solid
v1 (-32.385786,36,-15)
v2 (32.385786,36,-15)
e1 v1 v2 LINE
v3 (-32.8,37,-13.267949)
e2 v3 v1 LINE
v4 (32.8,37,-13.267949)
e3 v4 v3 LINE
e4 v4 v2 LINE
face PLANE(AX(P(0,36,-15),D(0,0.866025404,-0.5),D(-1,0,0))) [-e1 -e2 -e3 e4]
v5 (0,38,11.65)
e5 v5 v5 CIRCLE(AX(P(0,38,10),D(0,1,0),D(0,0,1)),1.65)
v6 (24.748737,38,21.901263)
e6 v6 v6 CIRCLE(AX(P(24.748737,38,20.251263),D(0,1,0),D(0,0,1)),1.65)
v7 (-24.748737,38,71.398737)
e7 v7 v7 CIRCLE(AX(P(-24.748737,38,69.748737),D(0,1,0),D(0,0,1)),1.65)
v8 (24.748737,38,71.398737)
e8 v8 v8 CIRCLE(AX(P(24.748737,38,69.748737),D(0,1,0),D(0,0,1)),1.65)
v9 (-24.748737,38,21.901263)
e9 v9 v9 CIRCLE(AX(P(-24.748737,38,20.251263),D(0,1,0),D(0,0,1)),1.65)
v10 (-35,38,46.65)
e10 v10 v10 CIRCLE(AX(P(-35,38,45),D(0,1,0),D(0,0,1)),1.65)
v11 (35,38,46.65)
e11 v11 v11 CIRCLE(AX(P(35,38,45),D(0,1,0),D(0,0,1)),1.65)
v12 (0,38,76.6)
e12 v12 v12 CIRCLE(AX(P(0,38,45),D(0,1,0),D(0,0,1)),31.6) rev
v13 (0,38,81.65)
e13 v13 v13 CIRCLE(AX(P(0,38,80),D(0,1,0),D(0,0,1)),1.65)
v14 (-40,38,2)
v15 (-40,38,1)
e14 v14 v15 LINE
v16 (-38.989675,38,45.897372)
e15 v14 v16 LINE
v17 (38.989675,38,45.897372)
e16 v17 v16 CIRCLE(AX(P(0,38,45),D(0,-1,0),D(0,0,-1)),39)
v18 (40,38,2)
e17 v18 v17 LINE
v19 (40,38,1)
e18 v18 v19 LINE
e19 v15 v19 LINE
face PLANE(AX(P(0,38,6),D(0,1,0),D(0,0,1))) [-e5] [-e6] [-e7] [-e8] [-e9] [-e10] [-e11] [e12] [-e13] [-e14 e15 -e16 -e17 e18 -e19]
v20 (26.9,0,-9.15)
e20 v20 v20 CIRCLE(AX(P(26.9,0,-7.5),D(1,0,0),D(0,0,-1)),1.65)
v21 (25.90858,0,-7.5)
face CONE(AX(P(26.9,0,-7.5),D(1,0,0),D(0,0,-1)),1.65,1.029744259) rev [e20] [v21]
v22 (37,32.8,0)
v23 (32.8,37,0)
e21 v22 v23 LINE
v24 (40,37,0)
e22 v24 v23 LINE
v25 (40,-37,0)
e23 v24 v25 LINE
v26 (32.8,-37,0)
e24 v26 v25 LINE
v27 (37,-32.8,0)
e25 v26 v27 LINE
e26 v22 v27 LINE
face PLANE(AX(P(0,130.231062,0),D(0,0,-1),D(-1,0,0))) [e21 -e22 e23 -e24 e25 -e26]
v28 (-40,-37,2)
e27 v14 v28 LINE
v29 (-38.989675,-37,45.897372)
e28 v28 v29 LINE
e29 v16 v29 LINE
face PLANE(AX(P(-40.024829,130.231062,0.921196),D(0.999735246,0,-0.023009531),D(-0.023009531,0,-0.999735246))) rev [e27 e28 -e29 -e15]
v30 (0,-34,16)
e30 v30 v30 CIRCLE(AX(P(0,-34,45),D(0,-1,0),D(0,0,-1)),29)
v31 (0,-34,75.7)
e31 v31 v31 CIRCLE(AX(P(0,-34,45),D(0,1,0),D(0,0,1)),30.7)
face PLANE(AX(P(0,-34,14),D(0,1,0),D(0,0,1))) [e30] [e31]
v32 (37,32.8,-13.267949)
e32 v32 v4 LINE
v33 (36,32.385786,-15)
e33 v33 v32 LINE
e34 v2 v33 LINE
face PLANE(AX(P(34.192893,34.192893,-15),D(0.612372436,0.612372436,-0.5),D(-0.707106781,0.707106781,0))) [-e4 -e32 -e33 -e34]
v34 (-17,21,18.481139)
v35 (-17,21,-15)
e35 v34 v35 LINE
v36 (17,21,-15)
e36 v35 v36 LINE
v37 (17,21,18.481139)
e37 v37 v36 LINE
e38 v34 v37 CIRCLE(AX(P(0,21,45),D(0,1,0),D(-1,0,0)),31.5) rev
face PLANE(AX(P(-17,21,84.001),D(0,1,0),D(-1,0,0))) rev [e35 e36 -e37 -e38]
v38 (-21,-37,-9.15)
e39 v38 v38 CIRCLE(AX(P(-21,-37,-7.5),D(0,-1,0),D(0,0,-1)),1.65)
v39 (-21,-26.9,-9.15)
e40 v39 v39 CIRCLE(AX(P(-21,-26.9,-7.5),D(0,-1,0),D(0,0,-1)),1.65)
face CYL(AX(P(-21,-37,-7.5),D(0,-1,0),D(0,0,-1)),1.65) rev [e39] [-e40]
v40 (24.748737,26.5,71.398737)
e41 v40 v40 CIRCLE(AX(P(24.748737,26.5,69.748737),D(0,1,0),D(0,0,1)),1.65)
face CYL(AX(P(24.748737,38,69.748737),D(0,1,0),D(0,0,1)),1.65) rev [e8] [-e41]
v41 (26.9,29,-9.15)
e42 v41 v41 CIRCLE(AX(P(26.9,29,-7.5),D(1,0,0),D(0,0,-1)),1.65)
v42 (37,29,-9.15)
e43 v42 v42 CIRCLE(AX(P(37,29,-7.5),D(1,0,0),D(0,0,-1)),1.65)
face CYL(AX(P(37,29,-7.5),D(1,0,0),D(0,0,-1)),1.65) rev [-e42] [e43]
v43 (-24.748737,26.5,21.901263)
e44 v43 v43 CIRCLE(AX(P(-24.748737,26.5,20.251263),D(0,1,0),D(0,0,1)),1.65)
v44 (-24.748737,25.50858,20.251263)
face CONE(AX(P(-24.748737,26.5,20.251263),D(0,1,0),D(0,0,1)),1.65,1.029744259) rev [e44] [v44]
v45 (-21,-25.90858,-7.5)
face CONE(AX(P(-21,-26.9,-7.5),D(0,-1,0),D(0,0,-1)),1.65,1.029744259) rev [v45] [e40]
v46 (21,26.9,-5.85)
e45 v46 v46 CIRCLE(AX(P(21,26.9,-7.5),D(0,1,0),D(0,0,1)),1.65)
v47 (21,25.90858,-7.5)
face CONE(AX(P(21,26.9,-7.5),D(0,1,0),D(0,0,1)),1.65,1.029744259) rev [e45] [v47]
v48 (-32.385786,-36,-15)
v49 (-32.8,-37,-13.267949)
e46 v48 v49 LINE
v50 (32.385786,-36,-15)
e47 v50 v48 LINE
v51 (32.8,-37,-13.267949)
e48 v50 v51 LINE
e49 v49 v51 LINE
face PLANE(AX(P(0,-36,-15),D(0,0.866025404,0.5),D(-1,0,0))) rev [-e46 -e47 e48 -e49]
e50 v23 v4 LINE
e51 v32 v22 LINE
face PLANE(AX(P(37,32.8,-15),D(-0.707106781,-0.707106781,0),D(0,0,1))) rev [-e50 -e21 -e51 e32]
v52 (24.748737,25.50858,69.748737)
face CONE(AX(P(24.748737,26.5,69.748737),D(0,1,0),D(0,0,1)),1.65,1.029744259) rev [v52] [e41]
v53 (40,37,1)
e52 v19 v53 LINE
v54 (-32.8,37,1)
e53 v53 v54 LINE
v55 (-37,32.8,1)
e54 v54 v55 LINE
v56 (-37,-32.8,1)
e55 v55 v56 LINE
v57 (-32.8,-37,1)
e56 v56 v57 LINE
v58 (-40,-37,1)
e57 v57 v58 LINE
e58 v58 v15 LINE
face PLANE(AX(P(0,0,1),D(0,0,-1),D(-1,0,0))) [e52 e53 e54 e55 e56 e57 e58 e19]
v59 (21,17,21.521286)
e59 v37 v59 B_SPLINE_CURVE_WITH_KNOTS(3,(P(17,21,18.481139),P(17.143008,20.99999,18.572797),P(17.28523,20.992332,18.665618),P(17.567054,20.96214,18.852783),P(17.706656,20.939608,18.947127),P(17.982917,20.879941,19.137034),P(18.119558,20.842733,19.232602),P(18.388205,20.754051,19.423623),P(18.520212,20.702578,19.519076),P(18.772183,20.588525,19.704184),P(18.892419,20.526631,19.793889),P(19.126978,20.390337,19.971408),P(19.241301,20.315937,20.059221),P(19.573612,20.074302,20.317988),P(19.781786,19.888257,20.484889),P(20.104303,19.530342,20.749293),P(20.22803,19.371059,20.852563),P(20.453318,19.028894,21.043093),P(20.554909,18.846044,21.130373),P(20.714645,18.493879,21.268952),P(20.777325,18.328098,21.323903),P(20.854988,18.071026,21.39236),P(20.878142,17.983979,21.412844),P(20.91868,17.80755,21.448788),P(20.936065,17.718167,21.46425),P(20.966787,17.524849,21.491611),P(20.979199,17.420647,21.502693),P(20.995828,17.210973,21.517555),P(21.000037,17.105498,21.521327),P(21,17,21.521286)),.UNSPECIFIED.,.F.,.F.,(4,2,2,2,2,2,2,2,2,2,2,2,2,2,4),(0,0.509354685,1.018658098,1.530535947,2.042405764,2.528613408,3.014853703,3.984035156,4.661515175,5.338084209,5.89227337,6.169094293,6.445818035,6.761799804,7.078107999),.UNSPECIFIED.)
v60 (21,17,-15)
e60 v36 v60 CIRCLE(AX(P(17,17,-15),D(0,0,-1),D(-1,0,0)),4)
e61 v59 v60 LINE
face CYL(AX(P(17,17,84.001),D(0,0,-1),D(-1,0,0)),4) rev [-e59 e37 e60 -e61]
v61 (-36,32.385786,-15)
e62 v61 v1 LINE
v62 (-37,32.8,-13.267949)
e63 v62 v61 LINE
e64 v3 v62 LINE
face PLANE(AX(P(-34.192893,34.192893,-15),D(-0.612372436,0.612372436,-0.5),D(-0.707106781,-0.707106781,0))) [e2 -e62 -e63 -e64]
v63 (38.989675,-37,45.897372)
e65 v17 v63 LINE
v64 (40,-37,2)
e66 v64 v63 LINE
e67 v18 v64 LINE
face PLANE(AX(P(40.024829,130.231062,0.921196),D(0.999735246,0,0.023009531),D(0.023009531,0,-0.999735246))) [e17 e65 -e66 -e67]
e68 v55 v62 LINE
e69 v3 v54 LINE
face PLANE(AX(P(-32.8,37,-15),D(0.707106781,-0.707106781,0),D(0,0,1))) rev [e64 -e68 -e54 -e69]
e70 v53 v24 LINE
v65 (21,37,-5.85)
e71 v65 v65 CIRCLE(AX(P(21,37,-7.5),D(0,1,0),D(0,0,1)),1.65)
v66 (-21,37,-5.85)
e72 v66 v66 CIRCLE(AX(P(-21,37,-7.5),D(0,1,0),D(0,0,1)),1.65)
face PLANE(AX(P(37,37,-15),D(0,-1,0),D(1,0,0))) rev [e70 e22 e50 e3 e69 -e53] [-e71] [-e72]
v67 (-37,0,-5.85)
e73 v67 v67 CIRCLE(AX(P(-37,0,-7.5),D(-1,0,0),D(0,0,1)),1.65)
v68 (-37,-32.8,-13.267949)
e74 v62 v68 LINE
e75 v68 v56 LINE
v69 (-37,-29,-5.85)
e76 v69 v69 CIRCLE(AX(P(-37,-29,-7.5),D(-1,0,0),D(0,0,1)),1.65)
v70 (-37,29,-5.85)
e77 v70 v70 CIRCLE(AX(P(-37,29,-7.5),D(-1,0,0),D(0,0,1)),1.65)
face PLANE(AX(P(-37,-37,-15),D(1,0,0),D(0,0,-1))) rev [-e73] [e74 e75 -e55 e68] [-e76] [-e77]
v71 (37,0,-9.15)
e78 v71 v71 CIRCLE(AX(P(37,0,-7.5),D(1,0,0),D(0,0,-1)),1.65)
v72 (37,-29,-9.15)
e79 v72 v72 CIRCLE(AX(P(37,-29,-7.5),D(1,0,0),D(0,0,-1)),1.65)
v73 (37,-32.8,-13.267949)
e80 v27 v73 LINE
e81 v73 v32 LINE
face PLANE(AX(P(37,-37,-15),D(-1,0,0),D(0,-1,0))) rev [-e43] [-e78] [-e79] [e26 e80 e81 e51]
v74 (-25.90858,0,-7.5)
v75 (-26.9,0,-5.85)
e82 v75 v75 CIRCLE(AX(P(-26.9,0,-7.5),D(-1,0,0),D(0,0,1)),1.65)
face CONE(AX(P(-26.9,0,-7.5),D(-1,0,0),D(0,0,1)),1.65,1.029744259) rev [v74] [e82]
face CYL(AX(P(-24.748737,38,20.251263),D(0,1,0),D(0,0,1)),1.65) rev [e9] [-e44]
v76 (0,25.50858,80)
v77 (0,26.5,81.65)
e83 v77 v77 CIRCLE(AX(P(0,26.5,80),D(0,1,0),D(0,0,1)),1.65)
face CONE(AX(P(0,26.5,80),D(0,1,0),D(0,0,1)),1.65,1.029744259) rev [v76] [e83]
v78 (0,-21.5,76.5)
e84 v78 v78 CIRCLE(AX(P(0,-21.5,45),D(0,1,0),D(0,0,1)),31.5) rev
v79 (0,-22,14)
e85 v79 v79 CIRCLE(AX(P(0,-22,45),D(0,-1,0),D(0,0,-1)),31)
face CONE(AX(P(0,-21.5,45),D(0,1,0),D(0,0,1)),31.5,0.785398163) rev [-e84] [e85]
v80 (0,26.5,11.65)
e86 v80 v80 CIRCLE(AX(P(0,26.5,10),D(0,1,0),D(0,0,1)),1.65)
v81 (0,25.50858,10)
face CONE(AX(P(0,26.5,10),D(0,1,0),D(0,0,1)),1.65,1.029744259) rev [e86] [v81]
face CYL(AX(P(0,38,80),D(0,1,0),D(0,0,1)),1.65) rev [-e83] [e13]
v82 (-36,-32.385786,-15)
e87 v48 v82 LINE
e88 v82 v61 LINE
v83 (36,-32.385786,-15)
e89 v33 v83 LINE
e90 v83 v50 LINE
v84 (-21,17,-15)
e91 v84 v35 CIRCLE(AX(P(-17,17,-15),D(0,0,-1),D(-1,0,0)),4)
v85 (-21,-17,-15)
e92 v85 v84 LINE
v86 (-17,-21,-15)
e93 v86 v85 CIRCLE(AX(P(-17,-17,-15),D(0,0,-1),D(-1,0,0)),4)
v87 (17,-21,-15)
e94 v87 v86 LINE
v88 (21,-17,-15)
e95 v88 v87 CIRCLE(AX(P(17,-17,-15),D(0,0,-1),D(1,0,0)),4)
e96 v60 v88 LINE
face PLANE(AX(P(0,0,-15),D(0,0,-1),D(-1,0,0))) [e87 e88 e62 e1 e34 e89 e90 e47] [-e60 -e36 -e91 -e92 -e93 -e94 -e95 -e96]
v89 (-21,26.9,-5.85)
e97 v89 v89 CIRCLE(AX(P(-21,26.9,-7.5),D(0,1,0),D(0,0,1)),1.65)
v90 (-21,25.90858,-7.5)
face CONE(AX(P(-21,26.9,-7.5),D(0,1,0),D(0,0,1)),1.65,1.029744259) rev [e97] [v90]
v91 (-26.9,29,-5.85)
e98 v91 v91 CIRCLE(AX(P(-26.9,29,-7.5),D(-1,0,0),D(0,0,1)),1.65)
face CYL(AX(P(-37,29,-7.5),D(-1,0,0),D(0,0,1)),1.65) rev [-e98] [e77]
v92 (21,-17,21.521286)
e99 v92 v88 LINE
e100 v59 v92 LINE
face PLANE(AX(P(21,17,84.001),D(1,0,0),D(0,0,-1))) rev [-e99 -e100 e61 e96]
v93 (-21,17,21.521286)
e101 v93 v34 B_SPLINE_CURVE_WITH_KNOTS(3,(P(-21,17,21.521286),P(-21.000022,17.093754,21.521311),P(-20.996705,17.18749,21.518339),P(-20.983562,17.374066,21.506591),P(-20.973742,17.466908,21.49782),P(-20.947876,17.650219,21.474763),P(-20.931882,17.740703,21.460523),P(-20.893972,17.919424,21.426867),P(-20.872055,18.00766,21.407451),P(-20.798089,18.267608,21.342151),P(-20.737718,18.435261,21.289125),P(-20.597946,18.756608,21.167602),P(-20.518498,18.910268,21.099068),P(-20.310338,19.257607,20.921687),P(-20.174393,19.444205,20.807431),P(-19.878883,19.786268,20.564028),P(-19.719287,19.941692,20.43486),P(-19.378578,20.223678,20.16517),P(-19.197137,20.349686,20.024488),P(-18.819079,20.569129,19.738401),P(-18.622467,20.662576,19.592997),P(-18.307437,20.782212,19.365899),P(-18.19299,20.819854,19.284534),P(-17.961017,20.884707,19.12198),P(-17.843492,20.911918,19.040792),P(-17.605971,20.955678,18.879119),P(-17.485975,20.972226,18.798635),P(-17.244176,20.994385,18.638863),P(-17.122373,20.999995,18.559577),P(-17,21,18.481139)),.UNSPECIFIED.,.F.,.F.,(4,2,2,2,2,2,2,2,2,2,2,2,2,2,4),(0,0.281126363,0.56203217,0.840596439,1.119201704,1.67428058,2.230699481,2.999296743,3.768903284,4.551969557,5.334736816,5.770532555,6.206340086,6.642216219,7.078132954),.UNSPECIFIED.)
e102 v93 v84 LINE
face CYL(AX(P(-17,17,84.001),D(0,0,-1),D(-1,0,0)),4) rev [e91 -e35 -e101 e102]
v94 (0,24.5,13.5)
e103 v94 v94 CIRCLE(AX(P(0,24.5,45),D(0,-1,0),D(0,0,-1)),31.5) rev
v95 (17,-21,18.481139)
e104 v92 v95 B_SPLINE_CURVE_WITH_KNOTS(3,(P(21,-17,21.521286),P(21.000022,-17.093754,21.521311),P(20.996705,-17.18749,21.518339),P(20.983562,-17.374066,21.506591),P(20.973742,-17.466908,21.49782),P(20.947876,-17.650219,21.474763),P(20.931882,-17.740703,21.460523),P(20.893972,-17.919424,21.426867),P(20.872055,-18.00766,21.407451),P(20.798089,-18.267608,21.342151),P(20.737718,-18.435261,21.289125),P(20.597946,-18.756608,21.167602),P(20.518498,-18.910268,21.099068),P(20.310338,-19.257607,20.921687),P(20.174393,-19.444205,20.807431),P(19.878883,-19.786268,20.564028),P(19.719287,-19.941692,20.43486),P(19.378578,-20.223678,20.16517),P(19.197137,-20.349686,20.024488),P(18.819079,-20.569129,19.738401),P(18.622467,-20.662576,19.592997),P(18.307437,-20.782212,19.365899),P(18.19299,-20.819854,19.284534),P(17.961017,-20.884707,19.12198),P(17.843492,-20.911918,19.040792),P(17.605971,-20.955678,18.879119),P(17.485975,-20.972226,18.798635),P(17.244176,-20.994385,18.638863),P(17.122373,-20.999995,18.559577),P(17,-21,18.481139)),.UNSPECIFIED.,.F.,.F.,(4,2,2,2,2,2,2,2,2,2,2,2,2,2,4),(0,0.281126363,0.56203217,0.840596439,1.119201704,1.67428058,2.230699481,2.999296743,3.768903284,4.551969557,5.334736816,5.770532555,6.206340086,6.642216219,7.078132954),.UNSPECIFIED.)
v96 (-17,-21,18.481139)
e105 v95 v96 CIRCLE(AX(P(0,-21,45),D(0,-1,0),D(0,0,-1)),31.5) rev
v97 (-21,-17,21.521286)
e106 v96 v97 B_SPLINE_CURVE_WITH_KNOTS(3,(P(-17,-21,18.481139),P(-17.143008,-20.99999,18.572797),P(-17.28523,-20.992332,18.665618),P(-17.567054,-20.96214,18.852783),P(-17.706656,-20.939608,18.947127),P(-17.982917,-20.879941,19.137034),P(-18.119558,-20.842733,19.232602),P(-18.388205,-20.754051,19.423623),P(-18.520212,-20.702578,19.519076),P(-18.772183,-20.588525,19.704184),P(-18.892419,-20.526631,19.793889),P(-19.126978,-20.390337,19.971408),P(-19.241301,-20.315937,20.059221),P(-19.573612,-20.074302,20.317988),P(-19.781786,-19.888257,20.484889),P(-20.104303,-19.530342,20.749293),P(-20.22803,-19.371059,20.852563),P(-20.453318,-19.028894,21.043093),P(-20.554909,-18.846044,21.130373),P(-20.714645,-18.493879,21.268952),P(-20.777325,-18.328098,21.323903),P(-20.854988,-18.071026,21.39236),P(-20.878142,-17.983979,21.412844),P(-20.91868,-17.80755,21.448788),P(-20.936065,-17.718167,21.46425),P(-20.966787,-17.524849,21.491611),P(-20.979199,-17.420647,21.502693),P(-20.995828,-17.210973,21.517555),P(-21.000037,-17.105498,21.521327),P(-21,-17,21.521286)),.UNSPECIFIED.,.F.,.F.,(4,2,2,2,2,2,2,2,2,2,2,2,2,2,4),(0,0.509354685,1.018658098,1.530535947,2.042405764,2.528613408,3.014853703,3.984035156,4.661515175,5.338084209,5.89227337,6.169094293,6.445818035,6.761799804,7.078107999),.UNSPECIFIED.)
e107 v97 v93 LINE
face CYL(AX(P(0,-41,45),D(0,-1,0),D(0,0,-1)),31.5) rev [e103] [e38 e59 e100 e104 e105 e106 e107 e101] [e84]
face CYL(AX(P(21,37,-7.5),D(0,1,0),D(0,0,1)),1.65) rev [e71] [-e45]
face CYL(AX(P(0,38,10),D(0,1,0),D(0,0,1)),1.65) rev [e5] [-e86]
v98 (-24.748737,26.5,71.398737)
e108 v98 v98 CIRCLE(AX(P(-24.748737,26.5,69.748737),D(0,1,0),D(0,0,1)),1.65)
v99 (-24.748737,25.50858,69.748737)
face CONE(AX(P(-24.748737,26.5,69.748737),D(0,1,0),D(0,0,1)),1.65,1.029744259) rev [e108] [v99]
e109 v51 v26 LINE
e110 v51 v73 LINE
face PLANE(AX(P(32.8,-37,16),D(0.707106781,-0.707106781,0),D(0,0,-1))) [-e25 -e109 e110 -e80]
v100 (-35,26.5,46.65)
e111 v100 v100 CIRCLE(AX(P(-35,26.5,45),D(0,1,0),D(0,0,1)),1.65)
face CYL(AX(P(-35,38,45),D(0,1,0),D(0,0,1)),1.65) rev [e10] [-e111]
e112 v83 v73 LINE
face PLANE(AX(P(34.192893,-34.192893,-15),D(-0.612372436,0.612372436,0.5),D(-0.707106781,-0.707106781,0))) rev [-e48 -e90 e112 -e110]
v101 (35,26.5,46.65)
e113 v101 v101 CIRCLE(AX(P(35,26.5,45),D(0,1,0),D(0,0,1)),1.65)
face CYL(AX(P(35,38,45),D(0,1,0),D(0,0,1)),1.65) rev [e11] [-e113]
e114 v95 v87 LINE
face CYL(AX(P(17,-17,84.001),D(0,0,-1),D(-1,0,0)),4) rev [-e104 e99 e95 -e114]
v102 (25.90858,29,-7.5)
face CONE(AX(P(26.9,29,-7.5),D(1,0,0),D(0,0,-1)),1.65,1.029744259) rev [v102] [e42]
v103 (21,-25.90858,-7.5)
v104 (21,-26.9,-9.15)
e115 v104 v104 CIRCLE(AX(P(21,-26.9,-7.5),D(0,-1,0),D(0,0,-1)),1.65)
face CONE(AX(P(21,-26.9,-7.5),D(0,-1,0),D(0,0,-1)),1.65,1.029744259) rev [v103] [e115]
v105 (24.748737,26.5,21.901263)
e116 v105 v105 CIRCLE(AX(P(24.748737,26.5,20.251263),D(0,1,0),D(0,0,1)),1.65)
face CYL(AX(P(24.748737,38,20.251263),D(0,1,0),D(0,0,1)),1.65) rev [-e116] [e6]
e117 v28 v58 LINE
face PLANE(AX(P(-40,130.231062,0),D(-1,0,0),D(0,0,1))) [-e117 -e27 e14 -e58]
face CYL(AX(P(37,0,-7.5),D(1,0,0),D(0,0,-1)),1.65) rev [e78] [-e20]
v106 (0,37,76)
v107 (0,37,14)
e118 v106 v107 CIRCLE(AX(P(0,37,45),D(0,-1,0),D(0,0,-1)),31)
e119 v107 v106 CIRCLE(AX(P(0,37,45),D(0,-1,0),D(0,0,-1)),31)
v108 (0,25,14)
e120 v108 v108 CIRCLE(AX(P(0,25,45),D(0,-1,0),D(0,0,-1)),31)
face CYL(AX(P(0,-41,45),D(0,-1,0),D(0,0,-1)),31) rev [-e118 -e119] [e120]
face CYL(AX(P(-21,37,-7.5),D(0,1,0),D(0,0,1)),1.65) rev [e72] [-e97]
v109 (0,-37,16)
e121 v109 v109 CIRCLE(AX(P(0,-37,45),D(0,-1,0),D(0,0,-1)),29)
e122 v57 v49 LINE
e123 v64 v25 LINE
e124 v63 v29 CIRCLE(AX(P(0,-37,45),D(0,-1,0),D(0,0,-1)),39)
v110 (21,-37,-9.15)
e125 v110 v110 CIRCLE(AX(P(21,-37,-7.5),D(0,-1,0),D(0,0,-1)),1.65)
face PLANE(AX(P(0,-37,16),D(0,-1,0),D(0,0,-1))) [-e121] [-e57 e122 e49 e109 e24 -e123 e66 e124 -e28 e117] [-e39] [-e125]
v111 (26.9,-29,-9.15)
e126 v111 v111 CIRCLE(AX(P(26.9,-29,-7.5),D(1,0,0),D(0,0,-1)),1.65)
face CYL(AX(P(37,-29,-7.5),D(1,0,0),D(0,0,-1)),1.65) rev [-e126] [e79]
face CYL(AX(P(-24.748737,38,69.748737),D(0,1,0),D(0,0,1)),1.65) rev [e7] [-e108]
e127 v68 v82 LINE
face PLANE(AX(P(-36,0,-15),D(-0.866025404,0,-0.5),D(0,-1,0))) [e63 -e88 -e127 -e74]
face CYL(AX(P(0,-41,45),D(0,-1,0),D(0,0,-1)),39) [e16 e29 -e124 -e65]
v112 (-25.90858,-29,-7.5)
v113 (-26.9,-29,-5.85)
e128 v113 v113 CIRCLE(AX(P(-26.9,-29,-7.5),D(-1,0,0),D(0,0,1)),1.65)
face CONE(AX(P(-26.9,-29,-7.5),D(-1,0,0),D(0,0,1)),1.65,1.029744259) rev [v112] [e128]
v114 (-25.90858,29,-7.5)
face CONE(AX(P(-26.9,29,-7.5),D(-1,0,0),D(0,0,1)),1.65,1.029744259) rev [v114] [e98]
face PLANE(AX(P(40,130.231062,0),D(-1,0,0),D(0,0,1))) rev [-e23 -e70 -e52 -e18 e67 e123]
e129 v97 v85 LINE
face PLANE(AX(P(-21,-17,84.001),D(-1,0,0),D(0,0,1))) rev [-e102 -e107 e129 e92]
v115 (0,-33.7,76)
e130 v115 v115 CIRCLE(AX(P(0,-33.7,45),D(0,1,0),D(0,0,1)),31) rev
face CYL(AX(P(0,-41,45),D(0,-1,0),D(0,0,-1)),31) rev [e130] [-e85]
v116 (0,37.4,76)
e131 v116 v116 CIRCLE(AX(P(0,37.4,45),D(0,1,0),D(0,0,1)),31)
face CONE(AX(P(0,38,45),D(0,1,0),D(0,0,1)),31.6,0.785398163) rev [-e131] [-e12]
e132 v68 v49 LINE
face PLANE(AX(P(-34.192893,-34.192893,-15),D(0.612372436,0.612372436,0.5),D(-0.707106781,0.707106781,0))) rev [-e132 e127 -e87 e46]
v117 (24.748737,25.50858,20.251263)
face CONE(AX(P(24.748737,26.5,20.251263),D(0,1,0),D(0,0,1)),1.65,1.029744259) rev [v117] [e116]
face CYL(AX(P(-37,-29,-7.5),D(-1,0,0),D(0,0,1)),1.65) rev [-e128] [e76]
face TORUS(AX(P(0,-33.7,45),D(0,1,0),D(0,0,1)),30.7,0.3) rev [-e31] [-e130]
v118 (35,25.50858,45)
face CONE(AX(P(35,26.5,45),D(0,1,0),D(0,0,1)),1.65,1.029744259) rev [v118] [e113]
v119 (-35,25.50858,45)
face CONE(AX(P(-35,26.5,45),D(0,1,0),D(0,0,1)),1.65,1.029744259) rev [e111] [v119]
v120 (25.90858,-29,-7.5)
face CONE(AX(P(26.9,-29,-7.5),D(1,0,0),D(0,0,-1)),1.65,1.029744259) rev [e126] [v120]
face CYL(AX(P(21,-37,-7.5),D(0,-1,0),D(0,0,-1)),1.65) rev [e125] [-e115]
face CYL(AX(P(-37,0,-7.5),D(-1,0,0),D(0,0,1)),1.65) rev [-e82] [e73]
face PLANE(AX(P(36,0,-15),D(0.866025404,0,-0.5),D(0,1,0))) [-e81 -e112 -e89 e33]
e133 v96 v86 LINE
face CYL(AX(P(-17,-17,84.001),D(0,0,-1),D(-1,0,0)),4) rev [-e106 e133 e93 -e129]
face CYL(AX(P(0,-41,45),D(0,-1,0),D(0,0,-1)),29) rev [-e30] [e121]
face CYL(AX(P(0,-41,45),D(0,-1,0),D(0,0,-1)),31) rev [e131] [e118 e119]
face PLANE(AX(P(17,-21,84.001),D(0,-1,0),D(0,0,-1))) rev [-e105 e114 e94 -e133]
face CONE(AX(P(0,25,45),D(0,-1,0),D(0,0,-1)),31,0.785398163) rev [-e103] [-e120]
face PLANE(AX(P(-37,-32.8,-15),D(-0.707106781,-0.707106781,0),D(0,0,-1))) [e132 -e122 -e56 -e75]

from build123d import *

# Parameters (mm, degrees)
BOSS_EXTRUDE1_REACH             = 103.485
BOSS_EXTRUDE1_DIRECTION_2_REACH = 103.485
SKETCH4_W                       = 74
SKETCH4_H                       = 74
BOSS_EXTRUDE2_DEPTH             = 15
SKETCH11_W                      = 2.15
SKETCH11_H                      = 3
M4_CLEARANCE_HOLE1_AT_2_COUNT   = 2
M4_CLEARANCE_HOLE1_AT_2_PITCH   = 26.787840266
M4_CLEARANCE_HOLE1_AT_3_COUNT   = 2
M4_CLEARANCE_HOLE1_AT_3_PITCH   = 49.497474683
M4_CLEARANCE_HOLE1_AT_4_COUNT   = 2
M4_CLEARANCE_HOLE1_AT_4_PITCH   = 64.671567276
M4_CLEARANCE_HOLE1_AT_5_COUNT   = 2
M4_CLEARANCE_HOLE1_AT_5_PITCH   = 70
M4_CLEARANCE_HOLE1_AT_6_COUNT   = 2
M4_CLEARANCE_HOLE1_AT_6_PITCH   = 64.671567276
M4_CLEARANCE_HOLE1_AT_7_COUNT   = 2
M4_CLEARANCE_HOLE1_AT_7_PITCH   = 49.497474683
M4_CLEARANCE_HOLE1_AT_8_COUNT   = 2
M4_CLEARANCE_HOLE1_AT_8_PITCH   = 26.787840266
M4_TAPPED_HOLE1_AT_2_COUNT      = 2
M4_TAPPED_HOLE1_AT_2_PITCH      = 26.787840266
M4_TAPPED_HOLE1_AT_3_COUNT      = 2
M4_TAPPED_HOLE1_AT_3_PITCH      = 49.497474683
M4_TAPPED_HOLE1_AT_4_COUNT      = 2
M4_TAPPED_HOLE1_AT_4_PITCH      = 26.787840266
M4_TAPPED_HOLE1_AT_5_COUNT      = 2
M4_TAPPED_HOLE1_AT_5_PITCH      = 49.497474683
M4_TAPPED_HOLE1_AT_6_COUNT      = 2
M4_TAPPED_HOLE1_AT_6_PITCH      = 64.671567276
M4_TAPPED_HOLE1_AT_7_COUNT      = 2
M4_TAPPED_HOLE1_AT_7_PITCH      = 70
M4_TAPPED_HOLE1_AT_8_COUNT      = 2
M4_TAPPED_HOLE1_AT_8_PITCH      = 64.671567276
CUT_EXTRUDE3_DEPTH              = 1
CHAMFER1_SIZE                   = 4.2
CHAMFER2_SIZE                   = 1
CHAMFER2_SIZE2                  = 1.732050808
FILLET1_R                       = 0.3
CHAMFER3_SIZE                   = 0.6
CHAMFER4_SIZE                   = 0.5
FILLET2_R                       = 0.4
CUT_EXTRUDE4_REACH              = 116.557
CUT_EXTRUDE4_END_RADIUS         = 31.5


with BuildPart() as part:
    # Sketch1 → Revolve1 (revolve)
    with BuildSketch(Plane(origin=(0, 0, 0), x_dir=(0, 0, -1), z_dir=(1, 0, 0))):
        Polygon((-14, -34), (-16, -34), (-16, -37), (-6, -37), (-6, 38), (-14, 38), (-14, 25), (-13.5, 25), (-13.5, -22), (-14, -22), align=None)
    revolve(axis=Axis((0, -41, 45), (0, 1, 0)))

    # Boss-Extrude1: up to this face of the body (flat: up to its plane)
    boss_extrude1_end = Plane(part.part.faces().sort_by_distance((0, 38, 82.896913421))[0])
    # Sketch3 → Boss-Extrude1 (add, up to the picked face)
    with BuildSketch(Plane(origin=(0, 0, 0), x_dir=(1, 0, 0), z_dir=(0, 1, 0)), mode=Mode.PRIVATE) as boss_extrude1_sk1:
        with BuildLine():
            Line((-40, -2), (-38.989674582, -45.897371704))
            ThreePointArc((-38.989674582, -45.897371704), (0, -6), (38.989674582, -45.897371704))
            Line((38.989674582, -45.897371704), (40, -2))
            Line((40, -2), (40, 0))
            Line((40, 0), (-40, 0))
            Line((-40, 0), (-40, -2))
        make_face()
    boss_extrude1_tool1 = split(extrude(boss_extrude1_sk1.sketch, amount=BOSS_EXTRUDE1_REACH, mode=Mode.PRIVATE), bisect_by=boss_extrude1_end, keep=Keep.BOTH, mode=Mode.PRIVATE)
    add(boss_extrude1_tool1.solids().sort_by(Axis((-38.572771, 0, 23.927464), (0, 1, 0)))[0])

    # Boss-Extrude1 direction 2: up to this face of the body (flat: up to its plane)
    boss_extrude1_direction_2_end = Plane(part.part.faces().sort_by_distance((0, -37, 75.103086579))[0])
    # Sketch3 → Boss-Extrude1 direction 2 (add, up to the picked face)
    with BuildSketch(Plane(origin=(0, 0, 0), x_dir=(1, 0, 0), z_dir=(0, 1, 0)), mode=Mode.PRIVATE) as boss_extrude1_direction_2_sk1:
        with BuildLine():
            Line((-40, -2), (-38.989674582, -45.897371704))
            ThreePointArc((-38.989674582, -45.897371704), (0, -6), (38.989674582, -45.897371704))
            Line((38.989674582, -45.897371704), (40, -2))
            Line((40, -2), (40, 0))
            Line((40, 0), (-40, 0))
            Line((-40, 0), (-40, -2))
        make_face()
    boss_extrude1_direction_2_tool1 = split(extrude(boss_extrude1_direction_2_sk1.sketch, amount=-BOSS_EXTRUDE1_DIRECTION_2_REACH, mode=Mode.PRIVATE), bisect_by=boss_extrude1_direction_2_end, keep=Keep.BOTH, mode=Mode.PRIVATE)
    add(boss_extrude1_direction_2_tool1.solids().sort_by(Axis((-38.572771, 0, 23.927464), (0, -1, 0)))[0])

    # Sketch4 → Boss-Extrude2 (add)
    with BuildSketch(Plane(origin=(0, 0, 0), x_dir=(-1, 0, 0), z_dir=(0, 0, -1))):
        Rectangle(SKETCH4_W, SKETCH4_H)
    extrude(amount=BOSS_EXTRUDE2_DEPTH)

    # Sketch16 → M4 Tapped Hole1 (revolve, cut)
    with BuildSketch(Plane(origin=(0, 38, 10), x_dir=(0, 0, 1), z_dir=(1, 0, 0))):
        Polygon((0, 0), (0, 12.491420021), (1.65, 11.5), (1.65, 0), align=None)
    m4_tapped_hole1 = revolve(axis=Axis((0, 44.35, 10), (0, -1, 0)), mode=Mode.SUBTRACT)

    # M4 Tapped Hole1 at 2: M4 Tapped Hole1 ×2
    with Locations(*[Vector(0.9238795325112865, 0, 0.3826834323650906) * (i * M4_TAPPED_HOLE1_AT_2_PITCH) for i in range(1, M4_TAPPED_HOLE1_AT_2_COUNT)]):
        add(m4_tapped_hole1, mode=Mode.SUBTRACT)

    # M4 Tapped Hole1 at 3: M4 Tapped Hole1 ×2
    with Locations(*[Vector(0.7071067811865465, 0, 0.7071067811865487) * (i * M4_TAPPED_HOLE1_AT_3_PITCH) for i in range(1, M4_TAPPED_HOLE1_AT_3_COUNT)]):
        add(m4_tapped_hole1, mode=Mode.SUBTRACT)

    # M4 Tapped Hole1 at 4: M4 Tapped Hole1 ×2
    with Locations(*[Vector(-0.9238795325112892, 0, 0.3826834323650839) * (i * M4_TAPPED_HOLE1_AT_4_PITCH) for i in range(1, M4_TAPPED_HOLE1_AT_4_COUNT)]):
        add(m4_tapped_hole1, mode=Mode.SUBTRACT)

    # M4 Tapped Hole1 at 5: M4 Tapped Hole1 ×2
    with Locations(*[Vector(-0.7071067811865513, 0, 0.7071067811865437) * (i * M4_TAPPED_HOLE1_AT_5_PITCH) for i in range(1, M4_TAPPED_HOLE1_AT_5_COUNT)]):
        add(m4_tapped_hole1, mode=Mode.SUBTRACT)

    # M4 Tapped Hole1 at 6: M4 Tapped Hole1 ×2
    with Locations(*[Vector(-0.38268343236509383, 0, 0.9238795325112851) * (i * M4_TAPPED_HOLE1_AT_6_PITCH) for i in range(1, M4_TAPPED_HOLE1_AT_6_COUNT)]):
        add(m4_tapped_hole1, mode=Mode.SUBTRACT)

    # M4 Tapped Hole1 at 7: M4 Tapped Hole1 ×2
    with Locations(*[(0, 0, i * M4_TAPPED_HOLE1_AT_7_PITCH) for i in range(1, M4_TAPPED_HOLE1_AT_7_COUNT)]):
        add(m4_tapped_hole1, mode=Mode.SUBTRACT)

    # M4 Tapped Hole1 at 8: M4 Tapped Hole1 ×2
    with Locations(*[Vector(0.3826834323650873, 0, 0.9238795325112877) * (i * M4_TAPPED_HOLE1_AT_8_PITCH) for i in range(1, M4_TAPPED_HOLE1_AT_8_COUNT)]):
        add(m4_tapped_hole1, mode=Mode.SUBTRACT)

    # Sketch19 → Cut-Extrude3 (cut)
    with BuildSketch(Plane(origin=(0, 0, 0), x_dir=(-1, 0, 0), z_dir=(0, 0, -1))):
        Polygon((40, -37), (37, -37), (37, 37), (-37, 37), (-40, 37), (-40, 38), (40, 38), align=None)
    extrude(amount=-CUT_EXTRUDE3_DEPTH, mode=Mode.SUBTRACT)

    # Sketch9 → M4 Tapped Hole2 (revolve, cut)
    with BuildSketch(Plane(origin=(37, 29, -7.5), x_dir=(0, 0, -1), z_dir=(0, 1, 0))):
        Polygon((0, 0), (0, 11.091420021), (1.65, 10.1), (1.65, 0), align=None)
    revolve(axis=Axis((43.35, 29, -7.5), (-1, 0, 0)), mode=Mode.SUBTRACT)

    # Sketch9 at point 2 (carried to point 2, square into its face) → M4 Tapped Hole2 at 2 (revolve, cut)
    with BuildSketch(Plane(origin=(37, -29, -7.5), x_dir=(0, 0, -1), z_dir=(0, 1, 0))):
        Polygon((0, 0), (0, 11.091420021), (1.65, 10.1), (1.65, 0), align=None)
    revolve(axis=Axis((43.35, -29, -7.5), (-1, 0, 0)), mode=Mode.SUBTRACT)

    # Sketch9 at point 3 (carried to point 3, square into its face) → M4 Tapped Hole2 at 3 (revolve, cut)
    with BuildSketch(Plane(origin=(-37, -29, -7.5), x_dir=(0, 0, -1), z_dir=(0, -1, 0))):
        Polygon((0, 0), (0, 11.091420021), (1.65, 10.1), (1.65, 0), align=None)
    revolve(axis=Axis((-43.35, -29, -7.5), (1, 0, 0)), mode=Mode.SUBTRACT)

    # Sketch9 at point 4 (carried to point 4, square into its face) → M4 Tapped Hole2 at 4 (revolve, cut)
    with BuildSketch(Plane(origin=(-37, 29, -7.5), x_dir=(0, 0, -1), z_dir=(0, -1, 0))):
        Polygon((0, 0), (0, 11.091420021), (1.65, 10.1), (1.65, 0), align=None)
    revolve(axis=Axis((-43.35, 29, -7.5), (1, 0, 0)), mode=Mode.SUBTRACT)

    # Sketch9 at point 5 (carried to point 5, square into its face) → M4 Tapped Hole2 at 5 (revolve, cut)
    with BuildSketch(Plane(origin=(37, 0, -7.5), x_dir=(0, 0, -1), z_dir=(0, 1, 0))):
        Polygon((0, 0), (0, 11.091420021), (1.65, 10.1), (1.65, 0), align=None)
    revolve(axis=Axis((43.35, 0, -7.5), (-1, 0, 0)), mode=Mode.SUBTRACT)

    # Sketch9 at point 6 (carried to point 6, square into its face) → M4 Tapped Hole2 at 6 (revolve, cut)
    with BuildSketch(Plane(origin=(-37, 0, -7.5), x_dir=(0, 0, -1), z_dir=(0, -1, 0))):
        Polygon((0, 0), (0, 11.091420021), (1.65, 10.1), (1.65, 0), align=None)
    revolve(axis=Axis((-43.35, 0, -7.5), (1, 0, 0)), mode=Mode.SUBTRACT)

    # Sketch9 at point 7 (carried to point 7, square into its face) → M4 Tapped Hole2 at 7 (revolve, cut)
    with BuildSketch(Plane(origin=(21, 37, -7.5), x_dir=(0, 0, -1), z_dir=(-1, 0, 0))):
        Polygon((0, 0), (0, 11.091420021), (1.65, 10.1), (1.65, 0), align=None)
    revolve(axis=Axis((21, 43.35, -7.5), (0, -1, 0)), mode=Mode.SUBTRACT)

    # Sketch9 at point 8 (carried to point 8, square into its face) → M4 Tapped Hole2 at 8 (revolve, cut)
    with BuildSketch(Plane(origin=(-21, 37, -7.5), x_dir=(0, 0, -1), z_dir=(-1, 0, 0))):
        Polygon((0, 0), (0, 11.091420021), (1.65, 10.1), (1.65, 0), align=None)
    revolve(axis=Axis((-21, 43.35, -7.5), (0, -1, 0)), mode=Mode.SUBTRACT)

    # Sketch9 at point 9 (carried to point 9, square into its face) → M4 Tapped Hole2 at 9 (revolve, cut)
    with BuildSketch(Plane(origin=(-21, -37, -7.5), x_dir=(0, 0, -1), z_dir=(1, 0, 0))):
        Polygon((0, 0), (0, 11.091420021), (1.65, 10.1), (1.65, 0), align=None)
    revolve(axis=Axis((-21, -43.35, -7.5), (0, 1, 0)), mode=Mode.SUBTRACT)

    # Sketch9 at point 10 (carried to point 10, square into its face) → M4 Tapped Hole2 at 10 (revolve, cut)
    with BuildSketch(Plane(origin=(21, -37, -7.5), x_dir=(0, 0, -1), z_dir=(1, 0, 0))):
        Polygon((0, 0), (0, 11.091420021), (1.65, 10.1), (1.65, 0), align=None)
    revolve(axis=Axis((21, -43.35, -7.5), (0, 1, 0)), mode=Mode.SUBTRACT)

    # Chamfer1
    chamfer1_edges = [part.edges().sort_by_distance(p)[0] for p in [
        (-37, 37, -7),
        (37, 37, -7.5),
        (37, -37, -7.5),
        (-37, -37, -7),
    ]]
    chamfer(chamfer1_edges, length=CHAMFER1_SIZE)

    # Chamfer2
    chamfer2_edges = [part.edges().sort_by_distance(p)[0] for p in [
        (0, 37, -15),
        (-37, 0, -15),
        (37, 0, -15),
        (0, -37, -15),
        (34.9, 34.9, -15),
        (34.9, -34.9, -15),
        (-34.9, -34.9, -15),
        (-34.9, 34.9, -15),
    ]]
    chamfer2_side = [part.faces().sort_by_distance(p)[0] for p in [
        (0, 0, -15),
    ]]
    chamfer(chamfer2_edges, length=CHAMFER2_SIZE, length2=CHAMFER2_SIZE2, reference=chamfer2_side[0])

    # Fillet1
    fillet1_edges = [part.edges().sort_by_distance(p)[0] for p in [
        (0, -34, 76),
    ]]
    fillet(fillet1_edges, radius=FILLET1_R)

    # Chamfer3
    chamfer3_edges = [part.edges().sort_by_distance(p)[0] for p in [
        (0, 38, 76),
    ]]
    chamfer(chamfer3_edges, length=CHAMFER3_SIZE)

    # Chamfer4
    chamfer4_edges = [part.edges().sort_by_distance(p)[0] for p in [
        (0, 25, 76.5),
        (0, -22, 76.5),
    ]]
    chamfer(chamfer4_edges, length=CHAMFER4_SIZE - 0.0001)  # a hair under: the kernel refuses the full size

    # Cut-Extrude4: up to this cylinder (the profile starts outside it)
    cut_extrude4_end = Plane(origin=(0, 0, 45), z_dir=(0, -1, 0)) * Cylinder(CUT_EXTRUDE4_END_RADIUS, 297.114, mode=Mode.PRIVATE)
    # Sketch21 → Cut-Extrude4 (cut, up to the surface)
    with BuildSketch(Plane(origin=(0, 0, -15), x_dir=(-1, 0, 0), z_dir=(0, 0, -1)), mode=Mode.PRIVATE) as cut_extrude4_sk1:
        with BuildLine():
            Line((-17, -21), (17, -21))
            ThreePointArc((17, -21), (19.828427125, -19.828427125), (21, -17))
            Line((21, -17), (21, 17))
            ThreePointArc((21, 17), (19.828427125, 19.828427125), (17, 21))
            Line((17, 21), (-17, 21))
            ThreePointArc((-17, 21), (-19.828427125, 19.828427125), (-21, 17))
            Line((-21, 17), (-21, -17))
            ThreePointArc((-21, -17), (-19.828427125, -19.828427125), (-17, -21))
        make_face()
    cut_extrude4_tool1 = extrude(cut_extrude4_sk1.sketch, amount=-CUT_EXTRUDE4_REACH, mode=Mode.PRIVATE) - cut_extrude4_end
    add(cut_extrude4_tool1.solids().sort_by_distance((0, 0, -15))[0], mode=Mode.SUBTRACT)


with BuildPart() as body_2:
    # Sketch2 → Revolve2 (revolve)
    with BuildSketch(Plane(origin=(0, 0, 0), x_dir=(0, 0, -1), z_dir=(1, 0, 0))):
        Polygon((-14, 37), (-16, 37), (-16, 41.5), (-6, 41.5), (-6, 38.5), (-14, 38.5), align=None)
    revolve(axis=Axis((0, -41, 45), (0, 1, 0)))

    # Sketch11 → M4 Clearance Hole1 (revolve, cut)
    with BuildSketch(Plane(origin=(-24.748737342, 41.5, 20.251262658), x_dir=(0, 0, 1), z_dir=(1, 0, 0))):
        with Locations((1.075, 1.5)):
            Rectangle(SKETCH11_W, SKETCH11_H)
    m4_clearance_hole1 = revolve(axis=Axis((-24.748737342, 47.85, 20.251262658), (0, -1, 0)), mode=Mode.SUBTRACT)

    # M4 Clearance Hole1 at 2: M4 Clearance Hole1 ×2
    with Locations(*[Vector(0.9238795325112892, 0, -0.3826834323650839) * (i * M4_CLEARANCE_HOLE1_AT_2_PITCH) for i in range(1, M4_CLEARANCE_HOLE1_AT_2_COUNT)]):
        add(m4_clearance_hole1, mode=Mode.SUBTRACT)

    # M4 Clearance Hole1 at 3: M4 Clearance Hole1 ×2
    with Locations(*[(i * M4_CLEARANCE_HOLE1_AT_3_PITCH, 0, 0) for i in range(1, M4_CLEARANCE_HOLE1_AT_3_COUNT)]):
        add(m4_clearance_hole1, mode=Mode.SUBTRACT)

    # M4 Clearance Hole1 at 4: M4 Clearance Hole1 ×2
    with Locations(*[Vector(0.9238795325112837, 0, 0.38268343236509733) * (i * M4_CLEARANCE_HOLE1_AT_4_PITCH) for i in range(1, M4_CLEARANCE_HOLE1_AT_4_COUNT)]):
        add(m4_clearance_hole1, mode=Mode.SUBTRACT)

    # M4 Clearance Hole1 at 5: M4 Clearance Hole1 ×2
    with Locations(*[Vector(0.707106781186541, 0, 0.707106781186554) * (i * M4_CLEARANCE_HOLE1_AT_5_PITCH) for i in range(1, M4_CLEARANCE_HOLE1_AT_5_COUNT)]):
        add(m4_clearance_hole1, mode=Mode.SUBTRACT)

    # M4 Clearance Hole1 at 6: M4 Clearance Hole1 ×2
    with Locations(*[Vector(0.38268343236508046, 0, 0.9238795325112907) * (i * M4_CLEARANCE_HOLE1_AT_6_PITCH) for i in range(1, M4_CLEARANCE_HOLE1_AT_6_COUNT)]):
        add(m4_clearance_hole1, mode=Mode.SUBTRACT)

    # M4 Clearance Hole1 at 7: M4 Clearance Hole1 ×2
    with Locations(*[(0, 0, i * M4_CLEARANCE_HOLE1_AT_7_PITCH) for i in range(1, M4_CLEARANCE_HOLE1_AT_7_COUNT)]):
        add(m4_clearance_hole1, mode=Mode.SUBTRACT)

    # M4 Clearance Hole1 at 8: M4 Clearance Hole1 ×2
    with Locations(*[Vector(-0.38268343236510083, 0, 0.9238795325112822) * (i * M4_CLEARANCE_HOLE1_AT_8_PITCH) for i in range(1, M4_CLEARANCE_HOLE1_AT_8_COUNT)]):
        add(m4_clearance_hole1, mode=Mode.SUBTRACT)

    # Fillet2
    fillet2_edges = [body_2.edges().sort_by_distance(p)[0] for p in [
        (0, 38.5, 76),
    ]]
    fillet(fillet2_edges, radius=FILLET2_R)


solid = part.part
